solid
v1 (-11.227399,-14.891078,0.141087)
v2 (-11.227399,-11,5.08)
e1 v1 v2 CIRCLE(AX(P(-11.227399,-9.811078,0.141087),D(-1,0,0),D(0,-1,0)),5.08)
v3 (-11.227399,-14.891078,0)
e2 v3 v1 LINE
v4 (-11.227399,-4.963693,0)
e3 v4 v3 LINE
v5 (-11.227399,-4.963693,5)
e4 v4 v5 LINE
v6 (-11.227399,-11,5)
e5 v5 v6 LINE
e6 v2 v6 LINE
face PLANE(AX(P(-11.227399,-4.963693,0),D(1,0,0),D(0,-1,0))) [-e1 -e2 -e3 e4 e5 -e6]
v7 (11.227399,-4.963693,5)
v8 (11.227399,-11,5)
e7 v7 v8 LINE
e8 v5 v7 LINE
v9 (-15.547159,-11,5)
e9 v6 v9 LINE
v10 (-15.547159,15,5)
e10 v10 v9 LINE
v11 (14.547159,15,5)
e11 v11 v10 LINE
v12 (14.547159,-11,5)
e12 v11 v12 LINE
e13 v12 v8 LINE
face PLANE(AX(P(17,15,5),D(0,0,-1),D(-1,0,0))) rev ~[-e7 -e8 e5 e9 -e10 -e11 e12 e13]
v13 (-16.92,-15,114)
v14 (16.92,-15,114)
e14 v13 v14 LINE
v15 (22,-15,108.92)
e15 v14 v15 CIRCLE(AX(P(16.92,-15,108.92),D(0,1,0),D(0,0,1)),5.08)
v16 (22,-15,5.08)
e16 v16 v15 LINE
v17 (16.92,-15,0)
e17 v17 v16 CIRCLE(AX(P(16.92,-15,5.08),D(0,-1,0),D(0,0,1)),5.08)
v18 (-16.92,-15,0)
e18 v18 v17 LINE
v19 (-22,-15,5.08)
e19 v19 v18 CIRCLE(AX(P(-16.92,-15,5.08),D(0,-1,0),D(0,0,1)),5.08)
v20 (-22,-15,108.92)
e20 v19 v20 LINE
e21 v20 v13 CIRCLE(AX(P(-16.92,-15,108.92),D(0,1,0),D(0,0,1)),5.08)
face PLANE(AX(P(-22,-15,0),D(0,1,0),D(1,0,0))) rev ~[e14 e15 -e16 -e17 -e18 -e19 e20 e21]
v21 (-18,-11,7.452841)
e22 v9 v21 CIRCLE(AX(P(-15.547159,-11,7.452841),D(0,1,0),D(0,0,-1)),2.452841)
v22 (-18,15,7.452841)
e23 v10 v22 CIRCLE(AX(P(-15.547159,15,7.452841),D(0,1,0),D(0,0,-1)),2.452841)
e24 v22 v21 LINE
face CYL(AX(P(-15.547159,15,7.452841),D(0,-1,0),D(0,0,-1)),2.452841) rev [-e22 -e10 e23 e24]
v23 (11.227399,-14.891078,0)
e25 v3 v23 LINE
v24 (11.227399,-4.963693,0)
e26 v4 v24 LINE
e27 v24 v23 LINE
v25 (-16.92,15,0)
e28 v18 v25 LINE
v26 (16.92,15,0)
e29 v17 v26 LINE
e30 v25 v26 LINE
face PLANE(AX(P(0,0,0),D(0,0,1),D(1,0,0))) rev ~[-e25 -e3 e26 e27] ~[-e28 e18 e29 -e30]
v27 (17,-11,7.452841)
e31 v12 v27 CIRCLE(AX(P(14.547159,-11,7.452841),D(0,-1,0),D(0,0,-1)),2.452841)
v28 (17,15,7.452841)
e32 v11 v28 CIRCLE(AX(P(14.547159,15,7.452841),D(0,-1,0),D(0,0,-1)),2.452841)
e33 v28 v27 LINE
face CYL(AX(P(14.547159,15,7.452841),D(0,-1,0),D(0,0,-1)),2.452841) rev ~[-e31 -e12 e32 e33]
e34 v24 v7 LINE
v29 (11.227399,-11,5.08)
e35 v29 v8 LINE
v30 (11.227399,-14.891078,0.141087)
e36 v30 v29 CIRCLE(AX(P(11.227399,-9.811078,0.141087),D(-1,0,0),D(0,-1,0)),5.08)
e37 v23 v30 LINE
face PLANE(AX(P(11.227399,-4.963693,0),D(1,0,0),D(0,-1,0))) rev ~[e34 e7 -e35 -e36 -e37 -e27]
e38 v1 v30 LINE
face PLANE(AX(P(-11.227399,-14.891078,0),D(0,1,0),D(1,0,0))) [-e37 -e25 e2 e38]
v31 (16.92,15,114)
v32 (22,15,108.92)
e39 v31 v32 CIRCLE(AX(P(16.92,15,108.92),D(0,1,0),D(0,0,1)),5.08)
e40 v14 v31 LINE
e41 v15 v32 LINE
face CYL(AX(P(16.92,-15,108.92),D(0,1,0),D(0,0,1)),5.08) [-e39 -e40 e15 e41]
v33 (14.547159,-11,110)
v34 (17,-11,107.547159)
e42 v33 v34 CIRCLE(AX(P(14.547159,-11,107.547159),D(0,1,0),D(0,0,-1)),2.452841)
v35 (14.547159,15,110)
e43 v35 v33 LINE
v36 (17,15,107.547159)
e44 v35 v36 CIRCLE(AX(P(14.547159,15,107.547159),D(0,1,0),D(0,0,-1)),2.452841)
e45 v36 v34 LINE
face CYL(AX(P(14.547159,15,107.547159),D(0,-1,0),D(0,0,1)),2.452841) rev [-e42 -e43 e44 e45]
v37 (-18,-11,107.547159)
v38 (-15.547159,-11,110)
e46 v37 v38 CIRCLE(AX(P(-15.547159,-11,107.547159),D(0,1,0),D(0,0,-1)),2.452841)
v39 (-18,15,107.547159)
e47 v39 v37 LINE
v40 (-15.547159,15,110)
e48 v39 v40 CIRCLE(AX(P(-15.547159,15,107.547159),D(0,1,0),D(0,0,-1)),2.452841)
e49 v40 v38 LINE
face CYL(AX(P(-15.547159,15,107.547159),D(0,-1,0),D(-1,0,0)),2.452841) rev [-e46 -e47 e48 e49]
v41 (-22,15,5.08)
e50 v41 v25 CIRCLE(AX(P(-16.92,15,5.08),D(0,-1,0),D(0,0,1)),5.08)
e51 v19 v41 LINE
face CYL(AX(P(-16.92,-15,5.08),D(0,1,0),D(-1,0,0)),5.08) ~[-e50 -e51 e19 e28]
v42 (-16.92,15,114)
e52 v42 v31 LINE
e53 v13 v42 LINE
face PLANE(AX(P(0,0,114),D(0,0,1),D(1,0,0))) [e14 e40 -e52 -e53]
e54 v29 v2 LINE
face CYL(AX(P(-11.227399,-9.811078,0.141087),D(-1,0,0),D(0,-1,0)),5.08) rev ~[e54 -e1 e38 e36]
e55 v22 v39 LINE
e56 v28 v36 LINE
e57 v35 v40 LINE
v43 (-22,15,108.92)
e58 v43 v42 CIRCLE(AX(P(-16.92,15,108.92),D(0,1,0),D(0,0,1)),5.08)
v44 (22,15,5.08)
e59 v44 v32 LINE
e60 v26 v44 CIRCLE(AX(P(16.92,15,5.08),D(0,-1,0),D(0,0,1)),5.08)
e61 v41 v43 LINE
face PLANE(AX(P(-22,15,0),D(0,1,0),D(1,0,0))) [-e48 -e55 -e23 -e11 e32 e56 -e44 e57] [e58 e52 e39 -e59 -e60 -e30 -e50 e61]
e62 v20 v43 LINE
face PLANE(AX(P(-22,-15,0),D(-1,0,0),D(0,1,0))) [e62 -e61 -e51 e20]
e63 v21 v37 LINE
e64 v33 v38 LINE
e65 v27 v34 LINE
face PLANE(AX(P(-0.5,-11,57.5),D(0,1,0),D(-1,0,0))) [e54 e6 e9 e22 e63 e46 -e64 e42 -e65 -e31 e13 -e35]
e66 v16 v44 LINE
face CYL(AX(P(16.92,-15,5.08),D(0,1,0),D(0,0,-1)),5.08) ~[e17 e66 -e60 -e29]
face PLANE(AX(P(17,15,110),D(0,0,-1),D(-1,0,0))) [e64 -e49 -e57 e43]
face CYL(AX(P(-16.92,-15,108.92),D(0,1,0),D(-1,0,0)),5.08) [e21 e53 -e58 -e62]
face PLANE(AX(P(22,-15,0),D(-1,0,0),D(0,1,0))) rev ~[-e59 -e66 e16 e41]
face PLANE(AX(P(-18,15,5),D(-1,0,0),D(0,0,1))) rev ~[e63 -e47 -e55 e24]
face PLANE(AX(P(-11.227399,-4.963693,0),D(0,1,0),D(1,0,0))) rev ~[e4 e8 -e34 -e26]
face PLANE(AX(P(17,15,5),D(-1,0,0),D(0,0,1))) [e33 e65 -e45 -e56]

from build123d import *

# Parameters (mm, degrees)
F0_W        = 44
F0_H        = 30
F1_DEPTH    = 114
F2_W        = 35
F2_H        = 105
F3_DEPTH    = 26
F4_R        = 5.08
F5_R        = 2.4528409794
F6_W        = 22.4547982216
F6_H        = 9.9273854867
F7_DEPTH    = 5.08
F8_T1_DEPTH = 22.4547982216


# Not quite as in the source:
# - a fillet or chamfer that OpenCascade refuses, or shapes differently, is made with other operations: its cross-section is extruded or revolved along the edge and cut away or added


with BuildPart() as f1:
    # F0 (on Top) → F1 (new body)
    with BuildSketch(Plane.XY):
        Rectangle(F0_W, F0_H)
    extrude(amount=F1_DEPTH)

    # F2 (on face) → F3 (cut)
    with BuildSketch(Plane(origin=(0, 15, 0), x_dir=(-1, 0, 0), z_dir=(0, 1, 0))):
        with Locations((0.5, 57.5)):
            Rectangle(F2_W, F2_H)
    extrude(amount=-F3_DEPTH, mode=Mode.SUBTRACT)

    # F4
    f4_edges = [f1.edges().sort_by_distance(p)[0] for p in [
        (22, 0, 0),
        (-22, 0, 0),
        (-22, 0, 114),
        (22, 0, 114),
    ]]
    fillet(f4_edges, radius=F4_R)

    # F5
    f5_edges = [f1.edges().sort_by_distance(p)[0] for p in [
        (17, 2, 110),
        (-18, 2, 110),
        (17, 2, 5),
        (-18, 2, 5),
    ]]
    fillet(f5_edges, radius=F5_R)

    # F6 (on face) → F7 (cut)
    with BuildSketch(Plane(origin=(0, 0, 0), x_dir=(1, 0, 0), z_dir=(0, 0, -1))):
        with Locations((0, 9.9273854867)):
            Rectangle(F6_W, F6_H)
    extrude(amount=-F7_DEPTH, mode=Mode.SUBTRACT)

    # F8: fillet of radius 5.08 on 1 edges, made by hand

    # F8_s2 → F8_t1 (join)
    with BuildSketch(Plane.YZ.offset(-11.2273991108)):
        with BuildLine():
            ThreePointArc((-14.89107823, 0.1410866555), (-13.8014493024, 3.2848644314), (-11, 5.08))
            Line((-11, 5.08), (-14.89107823, 5.08))
            Line((-14.89107823, 5.08), (-14.89107823, 0.1410866555))
        make_face()
    extrude(amount=F8_T1_DEPTH)


solid = f1.part
